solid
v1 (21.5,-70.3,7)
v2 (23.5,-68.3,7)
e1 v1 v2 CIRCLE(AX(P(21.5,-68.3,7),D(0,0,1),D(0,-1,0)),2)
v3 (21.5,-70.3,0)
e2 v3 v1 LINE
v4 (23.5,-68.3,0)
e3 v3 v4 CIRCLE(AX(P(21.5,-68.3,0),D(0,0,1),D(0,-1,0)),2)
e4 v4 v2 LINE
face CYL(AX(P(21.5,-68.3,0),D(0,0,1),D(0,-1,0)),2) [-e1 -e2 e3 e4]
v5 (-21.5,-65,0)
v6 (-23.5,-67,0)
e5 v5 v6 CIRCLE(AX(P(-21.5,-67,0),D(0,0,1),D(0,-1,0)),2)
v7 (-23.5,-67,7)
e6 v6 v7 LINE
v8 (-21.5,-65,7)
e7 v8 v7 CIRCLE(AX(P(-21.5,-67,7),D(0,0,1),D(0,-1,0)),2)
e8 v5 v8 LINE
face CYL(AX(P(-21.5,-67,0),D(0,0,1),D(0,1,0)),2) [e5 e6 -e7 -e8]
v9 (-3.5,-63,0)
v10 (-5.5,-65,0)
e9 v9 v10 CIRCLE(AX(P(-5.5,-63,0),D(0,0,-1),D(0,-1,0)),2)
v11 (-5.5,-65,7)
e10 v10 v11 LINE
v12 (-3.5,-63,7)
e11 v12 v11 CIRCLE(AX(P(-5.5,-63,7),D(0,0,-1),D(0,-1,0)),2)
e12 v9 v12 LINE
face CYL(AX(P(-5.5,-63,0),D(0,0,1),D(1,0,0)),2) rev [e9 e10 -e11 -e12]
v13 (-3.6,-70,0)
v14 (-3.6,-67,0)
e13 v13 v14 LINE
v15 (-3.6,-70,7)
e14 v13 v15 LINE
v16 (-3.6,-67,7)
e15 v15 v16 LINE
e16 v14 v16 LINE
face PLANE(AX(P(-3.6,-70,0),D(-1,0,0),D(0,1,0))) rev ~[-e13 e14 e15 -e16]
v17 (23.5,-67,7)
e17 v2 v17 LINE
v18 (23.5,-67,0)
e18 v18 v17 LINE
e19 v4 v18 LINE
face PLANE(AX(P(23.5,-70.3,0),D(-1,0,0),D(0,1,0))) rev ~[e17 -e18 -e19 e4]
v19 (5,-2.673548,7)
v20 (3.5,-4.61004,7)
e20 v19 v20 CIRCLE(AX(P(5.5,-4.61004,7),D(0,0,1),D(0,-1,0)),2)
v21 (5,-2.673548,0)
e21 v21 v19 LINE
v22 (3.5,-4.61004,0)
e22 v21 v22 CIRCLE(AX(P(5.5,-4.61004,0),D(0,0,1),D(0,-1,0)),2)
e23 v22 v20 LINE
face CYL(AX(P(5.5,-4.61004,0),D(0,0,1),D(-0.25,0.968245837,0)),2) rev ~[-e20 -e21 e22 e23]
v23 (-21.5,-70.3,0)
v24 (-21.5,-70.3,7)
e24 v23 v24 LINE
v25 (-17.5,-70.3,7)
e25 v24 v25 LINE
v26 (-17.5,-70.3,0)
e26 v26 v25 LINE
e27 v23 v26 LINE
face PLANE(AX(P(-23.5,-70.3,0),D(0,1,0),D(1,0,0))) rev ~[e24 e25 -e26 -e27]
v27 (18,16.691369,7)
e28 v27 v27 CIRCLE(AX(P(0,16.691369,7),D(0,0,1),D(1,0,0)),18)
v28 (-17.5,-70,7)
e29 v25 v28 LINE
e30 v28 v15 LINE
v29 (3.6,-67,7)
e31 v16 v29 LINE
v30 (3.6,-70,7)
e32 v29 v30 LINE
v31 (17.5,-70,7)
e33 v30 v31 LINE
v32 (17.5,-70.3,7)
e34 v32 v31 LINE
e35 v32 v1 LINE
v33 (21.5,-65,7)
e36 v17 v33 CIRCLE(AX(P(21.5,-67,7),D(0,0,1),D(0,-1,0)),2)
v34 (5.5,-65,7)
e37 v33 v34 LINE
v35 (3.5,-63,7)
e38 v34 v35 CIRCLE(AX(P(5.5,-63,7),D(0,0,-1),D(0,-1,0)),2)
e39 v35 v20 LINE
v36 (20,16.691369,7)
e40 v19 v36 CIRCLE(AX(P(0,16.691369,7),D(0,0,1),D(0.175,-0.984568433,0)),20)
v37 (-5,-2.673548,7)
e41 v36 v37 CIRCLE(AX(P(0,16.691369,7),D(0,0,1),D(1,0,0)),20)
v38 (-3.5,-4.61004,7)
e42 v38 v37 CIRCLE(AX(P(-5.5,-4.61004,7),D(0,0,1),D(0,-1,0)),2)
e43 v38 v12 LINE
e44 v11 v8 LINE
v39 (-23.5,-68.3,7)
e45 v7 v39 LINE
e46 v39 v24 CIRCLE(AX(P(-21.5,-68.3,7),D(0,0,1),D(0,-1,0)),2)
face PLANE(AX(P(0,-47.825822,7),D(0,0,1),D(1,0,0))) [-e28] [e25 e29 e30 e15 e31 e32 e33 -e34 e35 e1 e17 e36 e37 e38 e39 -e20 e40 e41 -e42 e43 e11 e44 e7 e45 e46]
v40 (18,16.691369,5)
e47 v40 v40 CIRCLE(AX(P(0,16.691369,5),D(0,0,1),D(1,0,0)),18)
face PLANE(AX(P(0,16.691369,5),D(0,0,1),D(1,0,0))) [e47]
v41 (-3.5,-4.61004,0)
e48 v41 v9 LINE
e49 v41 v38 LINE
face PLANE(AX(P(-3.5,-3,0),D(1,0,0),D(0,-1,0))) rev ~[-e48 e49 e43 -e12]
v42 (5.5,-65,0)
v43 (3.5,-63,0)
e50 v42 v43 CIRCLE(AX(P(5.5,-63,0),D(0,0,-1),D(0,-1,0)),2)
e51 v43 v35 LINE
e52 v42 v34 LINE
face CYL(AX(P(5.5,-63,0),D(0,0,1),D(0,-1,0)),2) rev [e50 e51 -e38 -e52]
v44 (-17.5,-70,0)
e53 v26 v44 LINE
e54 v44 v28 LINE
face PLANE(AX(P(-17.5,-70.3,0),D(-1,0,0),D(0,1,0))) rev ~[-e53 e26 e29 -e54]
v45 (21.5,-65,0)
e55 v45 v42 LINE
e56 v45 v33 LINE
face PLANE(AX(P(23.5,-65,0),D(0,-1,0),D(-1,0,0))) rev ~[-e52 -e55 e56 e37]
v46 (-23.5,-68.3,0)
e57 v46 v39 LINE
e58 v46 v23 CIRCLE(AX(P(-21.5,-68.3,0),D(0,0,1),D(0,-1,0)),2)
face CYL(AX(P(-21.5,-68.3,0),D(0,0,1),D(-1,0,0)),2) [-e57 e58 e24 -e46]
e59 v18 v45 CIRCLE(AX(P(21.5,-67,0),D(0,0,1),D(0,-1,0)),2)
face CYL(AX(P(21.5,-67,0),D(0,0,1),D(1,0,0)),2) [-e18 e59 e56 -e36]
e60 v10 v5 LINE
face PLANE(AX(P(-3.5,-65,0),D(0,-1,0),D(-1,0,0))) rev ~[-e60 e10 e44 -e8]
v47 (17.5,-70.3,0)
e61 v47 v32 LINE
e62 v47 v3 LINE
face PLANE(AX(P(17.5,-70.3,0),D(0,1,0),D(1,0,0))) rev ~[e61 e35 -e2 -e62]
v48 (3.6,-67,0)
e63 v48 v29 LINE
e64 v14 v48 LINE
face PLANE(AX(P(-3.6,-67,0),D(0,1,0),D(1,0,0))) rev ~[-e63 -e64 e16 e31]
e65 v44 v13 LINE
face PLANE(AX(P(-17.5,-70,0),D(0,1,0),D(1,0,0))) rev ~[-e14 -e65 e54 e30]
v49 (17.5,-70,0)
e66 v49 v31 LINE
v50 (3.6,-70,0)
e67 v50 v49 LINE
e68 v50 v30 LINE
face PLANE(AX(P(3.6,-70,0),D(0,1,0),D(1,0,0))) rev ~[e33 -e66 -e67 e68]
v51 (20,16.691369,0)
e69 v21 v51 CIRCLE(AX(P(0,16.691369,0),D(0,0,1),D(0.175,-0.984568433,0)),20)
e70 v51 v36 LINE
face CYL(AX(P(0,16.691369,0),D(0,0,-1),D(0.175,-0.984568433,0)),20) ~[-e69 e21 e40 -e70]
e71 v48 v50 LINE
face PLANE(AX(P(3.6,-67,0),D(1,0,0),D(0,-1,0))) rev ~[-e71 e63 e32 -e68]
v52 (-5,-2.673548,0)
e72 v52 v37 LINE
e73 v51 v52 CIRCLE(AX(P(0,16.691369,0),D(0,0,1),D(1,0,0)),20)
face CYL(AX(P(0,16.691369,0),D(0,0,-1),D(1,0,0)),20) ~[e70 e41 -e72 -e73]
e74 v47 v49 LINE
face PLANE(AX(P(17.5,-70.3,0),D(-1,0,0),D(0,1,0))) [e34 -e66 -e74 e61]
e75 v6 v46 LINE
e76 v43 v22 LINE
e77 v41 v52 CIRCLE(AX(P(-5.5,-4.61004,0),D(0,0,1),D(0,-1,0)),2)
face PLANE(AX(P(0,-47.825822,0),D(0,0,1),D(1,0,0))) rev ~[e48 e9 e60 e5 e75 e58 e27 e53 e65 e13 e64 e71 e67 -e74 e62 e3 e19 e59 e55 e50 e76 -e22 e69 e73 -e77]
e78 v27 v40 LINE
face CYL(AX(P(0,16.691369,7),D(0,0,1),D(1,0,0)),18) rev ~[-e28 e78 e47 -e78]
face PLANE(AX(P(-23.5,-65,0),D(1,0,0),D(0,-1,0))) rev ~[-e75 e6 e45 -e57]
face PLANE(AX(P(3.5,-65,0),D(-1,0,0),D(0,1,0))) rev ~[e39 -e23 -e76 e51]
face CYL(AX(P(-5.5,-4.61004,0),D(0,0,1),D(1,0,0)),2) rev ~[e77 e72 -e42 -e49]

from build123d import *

# Parameters (mm, degrees)
F0_W     = 6
F0_H     = 0.3
F1_DEPTH = 7
F2_R     = 18
F3_DEPTH = 2
F4_R     = 2


# Not quite as in the source:
# - a feature names something its author has since deleted; it is built from what else it names


with BuildPart() as f1:
    # F0 (on Top) → F1 (new body)
    with BuildSketch(Plane.XY):
        with BuildLine():
            ThreePointArc((3.5, -3), (0, -3.3086313325), (-3.5, -3))
            Line((-3.5, -3), (-3.5, -65))
            Line((-3.5, -65), (-23.5, -65))
            Line((-23.5, -65), (-23.5, -70))
            Line((-23.5, -70), (-17.5, -70))
            Line((-17.5, -70), (-3.6, -70))
            Line((-3.6, -70), (-3.6, -67))
            Line((-3.6, -67), (3.6, -67))
            Line((3.6, -67), (3.6, -70))
            Line((3.6, -70), (17.5, -70))
            Line((17.5, -70), (23.5, -70))
            Line((23.5, -70), (23.5, -65))
            Line((23.5, -65), (3.5, -65))
            Line((3.5, -65), (3.5, -3))
        make_face()
        with BuildLine():
            ThreePointArc((20, 16.6913686675), (-12.8452325787, 32.0210783843), (-3.5, -3))
            ThreePointArc((-3.5, -3), (0, -3.3086313325), (3.5, -3))
            ThreePointArc((3.5, -3), (15.3297097168, 3.8461360889), (20, 16.6913686675))
        make_face()
        with Locations((-20.5, -70.15)):
            Rectangle(F0_W, F0_H)
        with Locations((20.5, -70.15)):
            Rectangle(F0_W, F0_H)
    extrude(amount=F1_DEPTH)

    # F2 (on face) → F3 (cut)
    with BuildSketch(Plane.XY.offset(7)):
        with Locations((0, 16.6913686675)):
            Circle(F2_R)
    extrude(amount=-F3_DEPTH, mode=Mode.SUBTRACT)

    # F4
    f4_edges = [f1.edges().sort_by_distance(p)[0] for p in [
        (-3.5, -3, 3.5),
        (3.5, -3, 3.5),
        (23.5, -65, 3.5),
        (-23.5, -65, 3.5),
        (-3.5, -65, 3.5),
        (3.5, -65, 3.5),
        (-23.5, -70.3, 3.5),
        (23.5, -70.3, 3.5),
    ]]
    fillet(f4_edges, radius=F4_R)


solid = f1.part
